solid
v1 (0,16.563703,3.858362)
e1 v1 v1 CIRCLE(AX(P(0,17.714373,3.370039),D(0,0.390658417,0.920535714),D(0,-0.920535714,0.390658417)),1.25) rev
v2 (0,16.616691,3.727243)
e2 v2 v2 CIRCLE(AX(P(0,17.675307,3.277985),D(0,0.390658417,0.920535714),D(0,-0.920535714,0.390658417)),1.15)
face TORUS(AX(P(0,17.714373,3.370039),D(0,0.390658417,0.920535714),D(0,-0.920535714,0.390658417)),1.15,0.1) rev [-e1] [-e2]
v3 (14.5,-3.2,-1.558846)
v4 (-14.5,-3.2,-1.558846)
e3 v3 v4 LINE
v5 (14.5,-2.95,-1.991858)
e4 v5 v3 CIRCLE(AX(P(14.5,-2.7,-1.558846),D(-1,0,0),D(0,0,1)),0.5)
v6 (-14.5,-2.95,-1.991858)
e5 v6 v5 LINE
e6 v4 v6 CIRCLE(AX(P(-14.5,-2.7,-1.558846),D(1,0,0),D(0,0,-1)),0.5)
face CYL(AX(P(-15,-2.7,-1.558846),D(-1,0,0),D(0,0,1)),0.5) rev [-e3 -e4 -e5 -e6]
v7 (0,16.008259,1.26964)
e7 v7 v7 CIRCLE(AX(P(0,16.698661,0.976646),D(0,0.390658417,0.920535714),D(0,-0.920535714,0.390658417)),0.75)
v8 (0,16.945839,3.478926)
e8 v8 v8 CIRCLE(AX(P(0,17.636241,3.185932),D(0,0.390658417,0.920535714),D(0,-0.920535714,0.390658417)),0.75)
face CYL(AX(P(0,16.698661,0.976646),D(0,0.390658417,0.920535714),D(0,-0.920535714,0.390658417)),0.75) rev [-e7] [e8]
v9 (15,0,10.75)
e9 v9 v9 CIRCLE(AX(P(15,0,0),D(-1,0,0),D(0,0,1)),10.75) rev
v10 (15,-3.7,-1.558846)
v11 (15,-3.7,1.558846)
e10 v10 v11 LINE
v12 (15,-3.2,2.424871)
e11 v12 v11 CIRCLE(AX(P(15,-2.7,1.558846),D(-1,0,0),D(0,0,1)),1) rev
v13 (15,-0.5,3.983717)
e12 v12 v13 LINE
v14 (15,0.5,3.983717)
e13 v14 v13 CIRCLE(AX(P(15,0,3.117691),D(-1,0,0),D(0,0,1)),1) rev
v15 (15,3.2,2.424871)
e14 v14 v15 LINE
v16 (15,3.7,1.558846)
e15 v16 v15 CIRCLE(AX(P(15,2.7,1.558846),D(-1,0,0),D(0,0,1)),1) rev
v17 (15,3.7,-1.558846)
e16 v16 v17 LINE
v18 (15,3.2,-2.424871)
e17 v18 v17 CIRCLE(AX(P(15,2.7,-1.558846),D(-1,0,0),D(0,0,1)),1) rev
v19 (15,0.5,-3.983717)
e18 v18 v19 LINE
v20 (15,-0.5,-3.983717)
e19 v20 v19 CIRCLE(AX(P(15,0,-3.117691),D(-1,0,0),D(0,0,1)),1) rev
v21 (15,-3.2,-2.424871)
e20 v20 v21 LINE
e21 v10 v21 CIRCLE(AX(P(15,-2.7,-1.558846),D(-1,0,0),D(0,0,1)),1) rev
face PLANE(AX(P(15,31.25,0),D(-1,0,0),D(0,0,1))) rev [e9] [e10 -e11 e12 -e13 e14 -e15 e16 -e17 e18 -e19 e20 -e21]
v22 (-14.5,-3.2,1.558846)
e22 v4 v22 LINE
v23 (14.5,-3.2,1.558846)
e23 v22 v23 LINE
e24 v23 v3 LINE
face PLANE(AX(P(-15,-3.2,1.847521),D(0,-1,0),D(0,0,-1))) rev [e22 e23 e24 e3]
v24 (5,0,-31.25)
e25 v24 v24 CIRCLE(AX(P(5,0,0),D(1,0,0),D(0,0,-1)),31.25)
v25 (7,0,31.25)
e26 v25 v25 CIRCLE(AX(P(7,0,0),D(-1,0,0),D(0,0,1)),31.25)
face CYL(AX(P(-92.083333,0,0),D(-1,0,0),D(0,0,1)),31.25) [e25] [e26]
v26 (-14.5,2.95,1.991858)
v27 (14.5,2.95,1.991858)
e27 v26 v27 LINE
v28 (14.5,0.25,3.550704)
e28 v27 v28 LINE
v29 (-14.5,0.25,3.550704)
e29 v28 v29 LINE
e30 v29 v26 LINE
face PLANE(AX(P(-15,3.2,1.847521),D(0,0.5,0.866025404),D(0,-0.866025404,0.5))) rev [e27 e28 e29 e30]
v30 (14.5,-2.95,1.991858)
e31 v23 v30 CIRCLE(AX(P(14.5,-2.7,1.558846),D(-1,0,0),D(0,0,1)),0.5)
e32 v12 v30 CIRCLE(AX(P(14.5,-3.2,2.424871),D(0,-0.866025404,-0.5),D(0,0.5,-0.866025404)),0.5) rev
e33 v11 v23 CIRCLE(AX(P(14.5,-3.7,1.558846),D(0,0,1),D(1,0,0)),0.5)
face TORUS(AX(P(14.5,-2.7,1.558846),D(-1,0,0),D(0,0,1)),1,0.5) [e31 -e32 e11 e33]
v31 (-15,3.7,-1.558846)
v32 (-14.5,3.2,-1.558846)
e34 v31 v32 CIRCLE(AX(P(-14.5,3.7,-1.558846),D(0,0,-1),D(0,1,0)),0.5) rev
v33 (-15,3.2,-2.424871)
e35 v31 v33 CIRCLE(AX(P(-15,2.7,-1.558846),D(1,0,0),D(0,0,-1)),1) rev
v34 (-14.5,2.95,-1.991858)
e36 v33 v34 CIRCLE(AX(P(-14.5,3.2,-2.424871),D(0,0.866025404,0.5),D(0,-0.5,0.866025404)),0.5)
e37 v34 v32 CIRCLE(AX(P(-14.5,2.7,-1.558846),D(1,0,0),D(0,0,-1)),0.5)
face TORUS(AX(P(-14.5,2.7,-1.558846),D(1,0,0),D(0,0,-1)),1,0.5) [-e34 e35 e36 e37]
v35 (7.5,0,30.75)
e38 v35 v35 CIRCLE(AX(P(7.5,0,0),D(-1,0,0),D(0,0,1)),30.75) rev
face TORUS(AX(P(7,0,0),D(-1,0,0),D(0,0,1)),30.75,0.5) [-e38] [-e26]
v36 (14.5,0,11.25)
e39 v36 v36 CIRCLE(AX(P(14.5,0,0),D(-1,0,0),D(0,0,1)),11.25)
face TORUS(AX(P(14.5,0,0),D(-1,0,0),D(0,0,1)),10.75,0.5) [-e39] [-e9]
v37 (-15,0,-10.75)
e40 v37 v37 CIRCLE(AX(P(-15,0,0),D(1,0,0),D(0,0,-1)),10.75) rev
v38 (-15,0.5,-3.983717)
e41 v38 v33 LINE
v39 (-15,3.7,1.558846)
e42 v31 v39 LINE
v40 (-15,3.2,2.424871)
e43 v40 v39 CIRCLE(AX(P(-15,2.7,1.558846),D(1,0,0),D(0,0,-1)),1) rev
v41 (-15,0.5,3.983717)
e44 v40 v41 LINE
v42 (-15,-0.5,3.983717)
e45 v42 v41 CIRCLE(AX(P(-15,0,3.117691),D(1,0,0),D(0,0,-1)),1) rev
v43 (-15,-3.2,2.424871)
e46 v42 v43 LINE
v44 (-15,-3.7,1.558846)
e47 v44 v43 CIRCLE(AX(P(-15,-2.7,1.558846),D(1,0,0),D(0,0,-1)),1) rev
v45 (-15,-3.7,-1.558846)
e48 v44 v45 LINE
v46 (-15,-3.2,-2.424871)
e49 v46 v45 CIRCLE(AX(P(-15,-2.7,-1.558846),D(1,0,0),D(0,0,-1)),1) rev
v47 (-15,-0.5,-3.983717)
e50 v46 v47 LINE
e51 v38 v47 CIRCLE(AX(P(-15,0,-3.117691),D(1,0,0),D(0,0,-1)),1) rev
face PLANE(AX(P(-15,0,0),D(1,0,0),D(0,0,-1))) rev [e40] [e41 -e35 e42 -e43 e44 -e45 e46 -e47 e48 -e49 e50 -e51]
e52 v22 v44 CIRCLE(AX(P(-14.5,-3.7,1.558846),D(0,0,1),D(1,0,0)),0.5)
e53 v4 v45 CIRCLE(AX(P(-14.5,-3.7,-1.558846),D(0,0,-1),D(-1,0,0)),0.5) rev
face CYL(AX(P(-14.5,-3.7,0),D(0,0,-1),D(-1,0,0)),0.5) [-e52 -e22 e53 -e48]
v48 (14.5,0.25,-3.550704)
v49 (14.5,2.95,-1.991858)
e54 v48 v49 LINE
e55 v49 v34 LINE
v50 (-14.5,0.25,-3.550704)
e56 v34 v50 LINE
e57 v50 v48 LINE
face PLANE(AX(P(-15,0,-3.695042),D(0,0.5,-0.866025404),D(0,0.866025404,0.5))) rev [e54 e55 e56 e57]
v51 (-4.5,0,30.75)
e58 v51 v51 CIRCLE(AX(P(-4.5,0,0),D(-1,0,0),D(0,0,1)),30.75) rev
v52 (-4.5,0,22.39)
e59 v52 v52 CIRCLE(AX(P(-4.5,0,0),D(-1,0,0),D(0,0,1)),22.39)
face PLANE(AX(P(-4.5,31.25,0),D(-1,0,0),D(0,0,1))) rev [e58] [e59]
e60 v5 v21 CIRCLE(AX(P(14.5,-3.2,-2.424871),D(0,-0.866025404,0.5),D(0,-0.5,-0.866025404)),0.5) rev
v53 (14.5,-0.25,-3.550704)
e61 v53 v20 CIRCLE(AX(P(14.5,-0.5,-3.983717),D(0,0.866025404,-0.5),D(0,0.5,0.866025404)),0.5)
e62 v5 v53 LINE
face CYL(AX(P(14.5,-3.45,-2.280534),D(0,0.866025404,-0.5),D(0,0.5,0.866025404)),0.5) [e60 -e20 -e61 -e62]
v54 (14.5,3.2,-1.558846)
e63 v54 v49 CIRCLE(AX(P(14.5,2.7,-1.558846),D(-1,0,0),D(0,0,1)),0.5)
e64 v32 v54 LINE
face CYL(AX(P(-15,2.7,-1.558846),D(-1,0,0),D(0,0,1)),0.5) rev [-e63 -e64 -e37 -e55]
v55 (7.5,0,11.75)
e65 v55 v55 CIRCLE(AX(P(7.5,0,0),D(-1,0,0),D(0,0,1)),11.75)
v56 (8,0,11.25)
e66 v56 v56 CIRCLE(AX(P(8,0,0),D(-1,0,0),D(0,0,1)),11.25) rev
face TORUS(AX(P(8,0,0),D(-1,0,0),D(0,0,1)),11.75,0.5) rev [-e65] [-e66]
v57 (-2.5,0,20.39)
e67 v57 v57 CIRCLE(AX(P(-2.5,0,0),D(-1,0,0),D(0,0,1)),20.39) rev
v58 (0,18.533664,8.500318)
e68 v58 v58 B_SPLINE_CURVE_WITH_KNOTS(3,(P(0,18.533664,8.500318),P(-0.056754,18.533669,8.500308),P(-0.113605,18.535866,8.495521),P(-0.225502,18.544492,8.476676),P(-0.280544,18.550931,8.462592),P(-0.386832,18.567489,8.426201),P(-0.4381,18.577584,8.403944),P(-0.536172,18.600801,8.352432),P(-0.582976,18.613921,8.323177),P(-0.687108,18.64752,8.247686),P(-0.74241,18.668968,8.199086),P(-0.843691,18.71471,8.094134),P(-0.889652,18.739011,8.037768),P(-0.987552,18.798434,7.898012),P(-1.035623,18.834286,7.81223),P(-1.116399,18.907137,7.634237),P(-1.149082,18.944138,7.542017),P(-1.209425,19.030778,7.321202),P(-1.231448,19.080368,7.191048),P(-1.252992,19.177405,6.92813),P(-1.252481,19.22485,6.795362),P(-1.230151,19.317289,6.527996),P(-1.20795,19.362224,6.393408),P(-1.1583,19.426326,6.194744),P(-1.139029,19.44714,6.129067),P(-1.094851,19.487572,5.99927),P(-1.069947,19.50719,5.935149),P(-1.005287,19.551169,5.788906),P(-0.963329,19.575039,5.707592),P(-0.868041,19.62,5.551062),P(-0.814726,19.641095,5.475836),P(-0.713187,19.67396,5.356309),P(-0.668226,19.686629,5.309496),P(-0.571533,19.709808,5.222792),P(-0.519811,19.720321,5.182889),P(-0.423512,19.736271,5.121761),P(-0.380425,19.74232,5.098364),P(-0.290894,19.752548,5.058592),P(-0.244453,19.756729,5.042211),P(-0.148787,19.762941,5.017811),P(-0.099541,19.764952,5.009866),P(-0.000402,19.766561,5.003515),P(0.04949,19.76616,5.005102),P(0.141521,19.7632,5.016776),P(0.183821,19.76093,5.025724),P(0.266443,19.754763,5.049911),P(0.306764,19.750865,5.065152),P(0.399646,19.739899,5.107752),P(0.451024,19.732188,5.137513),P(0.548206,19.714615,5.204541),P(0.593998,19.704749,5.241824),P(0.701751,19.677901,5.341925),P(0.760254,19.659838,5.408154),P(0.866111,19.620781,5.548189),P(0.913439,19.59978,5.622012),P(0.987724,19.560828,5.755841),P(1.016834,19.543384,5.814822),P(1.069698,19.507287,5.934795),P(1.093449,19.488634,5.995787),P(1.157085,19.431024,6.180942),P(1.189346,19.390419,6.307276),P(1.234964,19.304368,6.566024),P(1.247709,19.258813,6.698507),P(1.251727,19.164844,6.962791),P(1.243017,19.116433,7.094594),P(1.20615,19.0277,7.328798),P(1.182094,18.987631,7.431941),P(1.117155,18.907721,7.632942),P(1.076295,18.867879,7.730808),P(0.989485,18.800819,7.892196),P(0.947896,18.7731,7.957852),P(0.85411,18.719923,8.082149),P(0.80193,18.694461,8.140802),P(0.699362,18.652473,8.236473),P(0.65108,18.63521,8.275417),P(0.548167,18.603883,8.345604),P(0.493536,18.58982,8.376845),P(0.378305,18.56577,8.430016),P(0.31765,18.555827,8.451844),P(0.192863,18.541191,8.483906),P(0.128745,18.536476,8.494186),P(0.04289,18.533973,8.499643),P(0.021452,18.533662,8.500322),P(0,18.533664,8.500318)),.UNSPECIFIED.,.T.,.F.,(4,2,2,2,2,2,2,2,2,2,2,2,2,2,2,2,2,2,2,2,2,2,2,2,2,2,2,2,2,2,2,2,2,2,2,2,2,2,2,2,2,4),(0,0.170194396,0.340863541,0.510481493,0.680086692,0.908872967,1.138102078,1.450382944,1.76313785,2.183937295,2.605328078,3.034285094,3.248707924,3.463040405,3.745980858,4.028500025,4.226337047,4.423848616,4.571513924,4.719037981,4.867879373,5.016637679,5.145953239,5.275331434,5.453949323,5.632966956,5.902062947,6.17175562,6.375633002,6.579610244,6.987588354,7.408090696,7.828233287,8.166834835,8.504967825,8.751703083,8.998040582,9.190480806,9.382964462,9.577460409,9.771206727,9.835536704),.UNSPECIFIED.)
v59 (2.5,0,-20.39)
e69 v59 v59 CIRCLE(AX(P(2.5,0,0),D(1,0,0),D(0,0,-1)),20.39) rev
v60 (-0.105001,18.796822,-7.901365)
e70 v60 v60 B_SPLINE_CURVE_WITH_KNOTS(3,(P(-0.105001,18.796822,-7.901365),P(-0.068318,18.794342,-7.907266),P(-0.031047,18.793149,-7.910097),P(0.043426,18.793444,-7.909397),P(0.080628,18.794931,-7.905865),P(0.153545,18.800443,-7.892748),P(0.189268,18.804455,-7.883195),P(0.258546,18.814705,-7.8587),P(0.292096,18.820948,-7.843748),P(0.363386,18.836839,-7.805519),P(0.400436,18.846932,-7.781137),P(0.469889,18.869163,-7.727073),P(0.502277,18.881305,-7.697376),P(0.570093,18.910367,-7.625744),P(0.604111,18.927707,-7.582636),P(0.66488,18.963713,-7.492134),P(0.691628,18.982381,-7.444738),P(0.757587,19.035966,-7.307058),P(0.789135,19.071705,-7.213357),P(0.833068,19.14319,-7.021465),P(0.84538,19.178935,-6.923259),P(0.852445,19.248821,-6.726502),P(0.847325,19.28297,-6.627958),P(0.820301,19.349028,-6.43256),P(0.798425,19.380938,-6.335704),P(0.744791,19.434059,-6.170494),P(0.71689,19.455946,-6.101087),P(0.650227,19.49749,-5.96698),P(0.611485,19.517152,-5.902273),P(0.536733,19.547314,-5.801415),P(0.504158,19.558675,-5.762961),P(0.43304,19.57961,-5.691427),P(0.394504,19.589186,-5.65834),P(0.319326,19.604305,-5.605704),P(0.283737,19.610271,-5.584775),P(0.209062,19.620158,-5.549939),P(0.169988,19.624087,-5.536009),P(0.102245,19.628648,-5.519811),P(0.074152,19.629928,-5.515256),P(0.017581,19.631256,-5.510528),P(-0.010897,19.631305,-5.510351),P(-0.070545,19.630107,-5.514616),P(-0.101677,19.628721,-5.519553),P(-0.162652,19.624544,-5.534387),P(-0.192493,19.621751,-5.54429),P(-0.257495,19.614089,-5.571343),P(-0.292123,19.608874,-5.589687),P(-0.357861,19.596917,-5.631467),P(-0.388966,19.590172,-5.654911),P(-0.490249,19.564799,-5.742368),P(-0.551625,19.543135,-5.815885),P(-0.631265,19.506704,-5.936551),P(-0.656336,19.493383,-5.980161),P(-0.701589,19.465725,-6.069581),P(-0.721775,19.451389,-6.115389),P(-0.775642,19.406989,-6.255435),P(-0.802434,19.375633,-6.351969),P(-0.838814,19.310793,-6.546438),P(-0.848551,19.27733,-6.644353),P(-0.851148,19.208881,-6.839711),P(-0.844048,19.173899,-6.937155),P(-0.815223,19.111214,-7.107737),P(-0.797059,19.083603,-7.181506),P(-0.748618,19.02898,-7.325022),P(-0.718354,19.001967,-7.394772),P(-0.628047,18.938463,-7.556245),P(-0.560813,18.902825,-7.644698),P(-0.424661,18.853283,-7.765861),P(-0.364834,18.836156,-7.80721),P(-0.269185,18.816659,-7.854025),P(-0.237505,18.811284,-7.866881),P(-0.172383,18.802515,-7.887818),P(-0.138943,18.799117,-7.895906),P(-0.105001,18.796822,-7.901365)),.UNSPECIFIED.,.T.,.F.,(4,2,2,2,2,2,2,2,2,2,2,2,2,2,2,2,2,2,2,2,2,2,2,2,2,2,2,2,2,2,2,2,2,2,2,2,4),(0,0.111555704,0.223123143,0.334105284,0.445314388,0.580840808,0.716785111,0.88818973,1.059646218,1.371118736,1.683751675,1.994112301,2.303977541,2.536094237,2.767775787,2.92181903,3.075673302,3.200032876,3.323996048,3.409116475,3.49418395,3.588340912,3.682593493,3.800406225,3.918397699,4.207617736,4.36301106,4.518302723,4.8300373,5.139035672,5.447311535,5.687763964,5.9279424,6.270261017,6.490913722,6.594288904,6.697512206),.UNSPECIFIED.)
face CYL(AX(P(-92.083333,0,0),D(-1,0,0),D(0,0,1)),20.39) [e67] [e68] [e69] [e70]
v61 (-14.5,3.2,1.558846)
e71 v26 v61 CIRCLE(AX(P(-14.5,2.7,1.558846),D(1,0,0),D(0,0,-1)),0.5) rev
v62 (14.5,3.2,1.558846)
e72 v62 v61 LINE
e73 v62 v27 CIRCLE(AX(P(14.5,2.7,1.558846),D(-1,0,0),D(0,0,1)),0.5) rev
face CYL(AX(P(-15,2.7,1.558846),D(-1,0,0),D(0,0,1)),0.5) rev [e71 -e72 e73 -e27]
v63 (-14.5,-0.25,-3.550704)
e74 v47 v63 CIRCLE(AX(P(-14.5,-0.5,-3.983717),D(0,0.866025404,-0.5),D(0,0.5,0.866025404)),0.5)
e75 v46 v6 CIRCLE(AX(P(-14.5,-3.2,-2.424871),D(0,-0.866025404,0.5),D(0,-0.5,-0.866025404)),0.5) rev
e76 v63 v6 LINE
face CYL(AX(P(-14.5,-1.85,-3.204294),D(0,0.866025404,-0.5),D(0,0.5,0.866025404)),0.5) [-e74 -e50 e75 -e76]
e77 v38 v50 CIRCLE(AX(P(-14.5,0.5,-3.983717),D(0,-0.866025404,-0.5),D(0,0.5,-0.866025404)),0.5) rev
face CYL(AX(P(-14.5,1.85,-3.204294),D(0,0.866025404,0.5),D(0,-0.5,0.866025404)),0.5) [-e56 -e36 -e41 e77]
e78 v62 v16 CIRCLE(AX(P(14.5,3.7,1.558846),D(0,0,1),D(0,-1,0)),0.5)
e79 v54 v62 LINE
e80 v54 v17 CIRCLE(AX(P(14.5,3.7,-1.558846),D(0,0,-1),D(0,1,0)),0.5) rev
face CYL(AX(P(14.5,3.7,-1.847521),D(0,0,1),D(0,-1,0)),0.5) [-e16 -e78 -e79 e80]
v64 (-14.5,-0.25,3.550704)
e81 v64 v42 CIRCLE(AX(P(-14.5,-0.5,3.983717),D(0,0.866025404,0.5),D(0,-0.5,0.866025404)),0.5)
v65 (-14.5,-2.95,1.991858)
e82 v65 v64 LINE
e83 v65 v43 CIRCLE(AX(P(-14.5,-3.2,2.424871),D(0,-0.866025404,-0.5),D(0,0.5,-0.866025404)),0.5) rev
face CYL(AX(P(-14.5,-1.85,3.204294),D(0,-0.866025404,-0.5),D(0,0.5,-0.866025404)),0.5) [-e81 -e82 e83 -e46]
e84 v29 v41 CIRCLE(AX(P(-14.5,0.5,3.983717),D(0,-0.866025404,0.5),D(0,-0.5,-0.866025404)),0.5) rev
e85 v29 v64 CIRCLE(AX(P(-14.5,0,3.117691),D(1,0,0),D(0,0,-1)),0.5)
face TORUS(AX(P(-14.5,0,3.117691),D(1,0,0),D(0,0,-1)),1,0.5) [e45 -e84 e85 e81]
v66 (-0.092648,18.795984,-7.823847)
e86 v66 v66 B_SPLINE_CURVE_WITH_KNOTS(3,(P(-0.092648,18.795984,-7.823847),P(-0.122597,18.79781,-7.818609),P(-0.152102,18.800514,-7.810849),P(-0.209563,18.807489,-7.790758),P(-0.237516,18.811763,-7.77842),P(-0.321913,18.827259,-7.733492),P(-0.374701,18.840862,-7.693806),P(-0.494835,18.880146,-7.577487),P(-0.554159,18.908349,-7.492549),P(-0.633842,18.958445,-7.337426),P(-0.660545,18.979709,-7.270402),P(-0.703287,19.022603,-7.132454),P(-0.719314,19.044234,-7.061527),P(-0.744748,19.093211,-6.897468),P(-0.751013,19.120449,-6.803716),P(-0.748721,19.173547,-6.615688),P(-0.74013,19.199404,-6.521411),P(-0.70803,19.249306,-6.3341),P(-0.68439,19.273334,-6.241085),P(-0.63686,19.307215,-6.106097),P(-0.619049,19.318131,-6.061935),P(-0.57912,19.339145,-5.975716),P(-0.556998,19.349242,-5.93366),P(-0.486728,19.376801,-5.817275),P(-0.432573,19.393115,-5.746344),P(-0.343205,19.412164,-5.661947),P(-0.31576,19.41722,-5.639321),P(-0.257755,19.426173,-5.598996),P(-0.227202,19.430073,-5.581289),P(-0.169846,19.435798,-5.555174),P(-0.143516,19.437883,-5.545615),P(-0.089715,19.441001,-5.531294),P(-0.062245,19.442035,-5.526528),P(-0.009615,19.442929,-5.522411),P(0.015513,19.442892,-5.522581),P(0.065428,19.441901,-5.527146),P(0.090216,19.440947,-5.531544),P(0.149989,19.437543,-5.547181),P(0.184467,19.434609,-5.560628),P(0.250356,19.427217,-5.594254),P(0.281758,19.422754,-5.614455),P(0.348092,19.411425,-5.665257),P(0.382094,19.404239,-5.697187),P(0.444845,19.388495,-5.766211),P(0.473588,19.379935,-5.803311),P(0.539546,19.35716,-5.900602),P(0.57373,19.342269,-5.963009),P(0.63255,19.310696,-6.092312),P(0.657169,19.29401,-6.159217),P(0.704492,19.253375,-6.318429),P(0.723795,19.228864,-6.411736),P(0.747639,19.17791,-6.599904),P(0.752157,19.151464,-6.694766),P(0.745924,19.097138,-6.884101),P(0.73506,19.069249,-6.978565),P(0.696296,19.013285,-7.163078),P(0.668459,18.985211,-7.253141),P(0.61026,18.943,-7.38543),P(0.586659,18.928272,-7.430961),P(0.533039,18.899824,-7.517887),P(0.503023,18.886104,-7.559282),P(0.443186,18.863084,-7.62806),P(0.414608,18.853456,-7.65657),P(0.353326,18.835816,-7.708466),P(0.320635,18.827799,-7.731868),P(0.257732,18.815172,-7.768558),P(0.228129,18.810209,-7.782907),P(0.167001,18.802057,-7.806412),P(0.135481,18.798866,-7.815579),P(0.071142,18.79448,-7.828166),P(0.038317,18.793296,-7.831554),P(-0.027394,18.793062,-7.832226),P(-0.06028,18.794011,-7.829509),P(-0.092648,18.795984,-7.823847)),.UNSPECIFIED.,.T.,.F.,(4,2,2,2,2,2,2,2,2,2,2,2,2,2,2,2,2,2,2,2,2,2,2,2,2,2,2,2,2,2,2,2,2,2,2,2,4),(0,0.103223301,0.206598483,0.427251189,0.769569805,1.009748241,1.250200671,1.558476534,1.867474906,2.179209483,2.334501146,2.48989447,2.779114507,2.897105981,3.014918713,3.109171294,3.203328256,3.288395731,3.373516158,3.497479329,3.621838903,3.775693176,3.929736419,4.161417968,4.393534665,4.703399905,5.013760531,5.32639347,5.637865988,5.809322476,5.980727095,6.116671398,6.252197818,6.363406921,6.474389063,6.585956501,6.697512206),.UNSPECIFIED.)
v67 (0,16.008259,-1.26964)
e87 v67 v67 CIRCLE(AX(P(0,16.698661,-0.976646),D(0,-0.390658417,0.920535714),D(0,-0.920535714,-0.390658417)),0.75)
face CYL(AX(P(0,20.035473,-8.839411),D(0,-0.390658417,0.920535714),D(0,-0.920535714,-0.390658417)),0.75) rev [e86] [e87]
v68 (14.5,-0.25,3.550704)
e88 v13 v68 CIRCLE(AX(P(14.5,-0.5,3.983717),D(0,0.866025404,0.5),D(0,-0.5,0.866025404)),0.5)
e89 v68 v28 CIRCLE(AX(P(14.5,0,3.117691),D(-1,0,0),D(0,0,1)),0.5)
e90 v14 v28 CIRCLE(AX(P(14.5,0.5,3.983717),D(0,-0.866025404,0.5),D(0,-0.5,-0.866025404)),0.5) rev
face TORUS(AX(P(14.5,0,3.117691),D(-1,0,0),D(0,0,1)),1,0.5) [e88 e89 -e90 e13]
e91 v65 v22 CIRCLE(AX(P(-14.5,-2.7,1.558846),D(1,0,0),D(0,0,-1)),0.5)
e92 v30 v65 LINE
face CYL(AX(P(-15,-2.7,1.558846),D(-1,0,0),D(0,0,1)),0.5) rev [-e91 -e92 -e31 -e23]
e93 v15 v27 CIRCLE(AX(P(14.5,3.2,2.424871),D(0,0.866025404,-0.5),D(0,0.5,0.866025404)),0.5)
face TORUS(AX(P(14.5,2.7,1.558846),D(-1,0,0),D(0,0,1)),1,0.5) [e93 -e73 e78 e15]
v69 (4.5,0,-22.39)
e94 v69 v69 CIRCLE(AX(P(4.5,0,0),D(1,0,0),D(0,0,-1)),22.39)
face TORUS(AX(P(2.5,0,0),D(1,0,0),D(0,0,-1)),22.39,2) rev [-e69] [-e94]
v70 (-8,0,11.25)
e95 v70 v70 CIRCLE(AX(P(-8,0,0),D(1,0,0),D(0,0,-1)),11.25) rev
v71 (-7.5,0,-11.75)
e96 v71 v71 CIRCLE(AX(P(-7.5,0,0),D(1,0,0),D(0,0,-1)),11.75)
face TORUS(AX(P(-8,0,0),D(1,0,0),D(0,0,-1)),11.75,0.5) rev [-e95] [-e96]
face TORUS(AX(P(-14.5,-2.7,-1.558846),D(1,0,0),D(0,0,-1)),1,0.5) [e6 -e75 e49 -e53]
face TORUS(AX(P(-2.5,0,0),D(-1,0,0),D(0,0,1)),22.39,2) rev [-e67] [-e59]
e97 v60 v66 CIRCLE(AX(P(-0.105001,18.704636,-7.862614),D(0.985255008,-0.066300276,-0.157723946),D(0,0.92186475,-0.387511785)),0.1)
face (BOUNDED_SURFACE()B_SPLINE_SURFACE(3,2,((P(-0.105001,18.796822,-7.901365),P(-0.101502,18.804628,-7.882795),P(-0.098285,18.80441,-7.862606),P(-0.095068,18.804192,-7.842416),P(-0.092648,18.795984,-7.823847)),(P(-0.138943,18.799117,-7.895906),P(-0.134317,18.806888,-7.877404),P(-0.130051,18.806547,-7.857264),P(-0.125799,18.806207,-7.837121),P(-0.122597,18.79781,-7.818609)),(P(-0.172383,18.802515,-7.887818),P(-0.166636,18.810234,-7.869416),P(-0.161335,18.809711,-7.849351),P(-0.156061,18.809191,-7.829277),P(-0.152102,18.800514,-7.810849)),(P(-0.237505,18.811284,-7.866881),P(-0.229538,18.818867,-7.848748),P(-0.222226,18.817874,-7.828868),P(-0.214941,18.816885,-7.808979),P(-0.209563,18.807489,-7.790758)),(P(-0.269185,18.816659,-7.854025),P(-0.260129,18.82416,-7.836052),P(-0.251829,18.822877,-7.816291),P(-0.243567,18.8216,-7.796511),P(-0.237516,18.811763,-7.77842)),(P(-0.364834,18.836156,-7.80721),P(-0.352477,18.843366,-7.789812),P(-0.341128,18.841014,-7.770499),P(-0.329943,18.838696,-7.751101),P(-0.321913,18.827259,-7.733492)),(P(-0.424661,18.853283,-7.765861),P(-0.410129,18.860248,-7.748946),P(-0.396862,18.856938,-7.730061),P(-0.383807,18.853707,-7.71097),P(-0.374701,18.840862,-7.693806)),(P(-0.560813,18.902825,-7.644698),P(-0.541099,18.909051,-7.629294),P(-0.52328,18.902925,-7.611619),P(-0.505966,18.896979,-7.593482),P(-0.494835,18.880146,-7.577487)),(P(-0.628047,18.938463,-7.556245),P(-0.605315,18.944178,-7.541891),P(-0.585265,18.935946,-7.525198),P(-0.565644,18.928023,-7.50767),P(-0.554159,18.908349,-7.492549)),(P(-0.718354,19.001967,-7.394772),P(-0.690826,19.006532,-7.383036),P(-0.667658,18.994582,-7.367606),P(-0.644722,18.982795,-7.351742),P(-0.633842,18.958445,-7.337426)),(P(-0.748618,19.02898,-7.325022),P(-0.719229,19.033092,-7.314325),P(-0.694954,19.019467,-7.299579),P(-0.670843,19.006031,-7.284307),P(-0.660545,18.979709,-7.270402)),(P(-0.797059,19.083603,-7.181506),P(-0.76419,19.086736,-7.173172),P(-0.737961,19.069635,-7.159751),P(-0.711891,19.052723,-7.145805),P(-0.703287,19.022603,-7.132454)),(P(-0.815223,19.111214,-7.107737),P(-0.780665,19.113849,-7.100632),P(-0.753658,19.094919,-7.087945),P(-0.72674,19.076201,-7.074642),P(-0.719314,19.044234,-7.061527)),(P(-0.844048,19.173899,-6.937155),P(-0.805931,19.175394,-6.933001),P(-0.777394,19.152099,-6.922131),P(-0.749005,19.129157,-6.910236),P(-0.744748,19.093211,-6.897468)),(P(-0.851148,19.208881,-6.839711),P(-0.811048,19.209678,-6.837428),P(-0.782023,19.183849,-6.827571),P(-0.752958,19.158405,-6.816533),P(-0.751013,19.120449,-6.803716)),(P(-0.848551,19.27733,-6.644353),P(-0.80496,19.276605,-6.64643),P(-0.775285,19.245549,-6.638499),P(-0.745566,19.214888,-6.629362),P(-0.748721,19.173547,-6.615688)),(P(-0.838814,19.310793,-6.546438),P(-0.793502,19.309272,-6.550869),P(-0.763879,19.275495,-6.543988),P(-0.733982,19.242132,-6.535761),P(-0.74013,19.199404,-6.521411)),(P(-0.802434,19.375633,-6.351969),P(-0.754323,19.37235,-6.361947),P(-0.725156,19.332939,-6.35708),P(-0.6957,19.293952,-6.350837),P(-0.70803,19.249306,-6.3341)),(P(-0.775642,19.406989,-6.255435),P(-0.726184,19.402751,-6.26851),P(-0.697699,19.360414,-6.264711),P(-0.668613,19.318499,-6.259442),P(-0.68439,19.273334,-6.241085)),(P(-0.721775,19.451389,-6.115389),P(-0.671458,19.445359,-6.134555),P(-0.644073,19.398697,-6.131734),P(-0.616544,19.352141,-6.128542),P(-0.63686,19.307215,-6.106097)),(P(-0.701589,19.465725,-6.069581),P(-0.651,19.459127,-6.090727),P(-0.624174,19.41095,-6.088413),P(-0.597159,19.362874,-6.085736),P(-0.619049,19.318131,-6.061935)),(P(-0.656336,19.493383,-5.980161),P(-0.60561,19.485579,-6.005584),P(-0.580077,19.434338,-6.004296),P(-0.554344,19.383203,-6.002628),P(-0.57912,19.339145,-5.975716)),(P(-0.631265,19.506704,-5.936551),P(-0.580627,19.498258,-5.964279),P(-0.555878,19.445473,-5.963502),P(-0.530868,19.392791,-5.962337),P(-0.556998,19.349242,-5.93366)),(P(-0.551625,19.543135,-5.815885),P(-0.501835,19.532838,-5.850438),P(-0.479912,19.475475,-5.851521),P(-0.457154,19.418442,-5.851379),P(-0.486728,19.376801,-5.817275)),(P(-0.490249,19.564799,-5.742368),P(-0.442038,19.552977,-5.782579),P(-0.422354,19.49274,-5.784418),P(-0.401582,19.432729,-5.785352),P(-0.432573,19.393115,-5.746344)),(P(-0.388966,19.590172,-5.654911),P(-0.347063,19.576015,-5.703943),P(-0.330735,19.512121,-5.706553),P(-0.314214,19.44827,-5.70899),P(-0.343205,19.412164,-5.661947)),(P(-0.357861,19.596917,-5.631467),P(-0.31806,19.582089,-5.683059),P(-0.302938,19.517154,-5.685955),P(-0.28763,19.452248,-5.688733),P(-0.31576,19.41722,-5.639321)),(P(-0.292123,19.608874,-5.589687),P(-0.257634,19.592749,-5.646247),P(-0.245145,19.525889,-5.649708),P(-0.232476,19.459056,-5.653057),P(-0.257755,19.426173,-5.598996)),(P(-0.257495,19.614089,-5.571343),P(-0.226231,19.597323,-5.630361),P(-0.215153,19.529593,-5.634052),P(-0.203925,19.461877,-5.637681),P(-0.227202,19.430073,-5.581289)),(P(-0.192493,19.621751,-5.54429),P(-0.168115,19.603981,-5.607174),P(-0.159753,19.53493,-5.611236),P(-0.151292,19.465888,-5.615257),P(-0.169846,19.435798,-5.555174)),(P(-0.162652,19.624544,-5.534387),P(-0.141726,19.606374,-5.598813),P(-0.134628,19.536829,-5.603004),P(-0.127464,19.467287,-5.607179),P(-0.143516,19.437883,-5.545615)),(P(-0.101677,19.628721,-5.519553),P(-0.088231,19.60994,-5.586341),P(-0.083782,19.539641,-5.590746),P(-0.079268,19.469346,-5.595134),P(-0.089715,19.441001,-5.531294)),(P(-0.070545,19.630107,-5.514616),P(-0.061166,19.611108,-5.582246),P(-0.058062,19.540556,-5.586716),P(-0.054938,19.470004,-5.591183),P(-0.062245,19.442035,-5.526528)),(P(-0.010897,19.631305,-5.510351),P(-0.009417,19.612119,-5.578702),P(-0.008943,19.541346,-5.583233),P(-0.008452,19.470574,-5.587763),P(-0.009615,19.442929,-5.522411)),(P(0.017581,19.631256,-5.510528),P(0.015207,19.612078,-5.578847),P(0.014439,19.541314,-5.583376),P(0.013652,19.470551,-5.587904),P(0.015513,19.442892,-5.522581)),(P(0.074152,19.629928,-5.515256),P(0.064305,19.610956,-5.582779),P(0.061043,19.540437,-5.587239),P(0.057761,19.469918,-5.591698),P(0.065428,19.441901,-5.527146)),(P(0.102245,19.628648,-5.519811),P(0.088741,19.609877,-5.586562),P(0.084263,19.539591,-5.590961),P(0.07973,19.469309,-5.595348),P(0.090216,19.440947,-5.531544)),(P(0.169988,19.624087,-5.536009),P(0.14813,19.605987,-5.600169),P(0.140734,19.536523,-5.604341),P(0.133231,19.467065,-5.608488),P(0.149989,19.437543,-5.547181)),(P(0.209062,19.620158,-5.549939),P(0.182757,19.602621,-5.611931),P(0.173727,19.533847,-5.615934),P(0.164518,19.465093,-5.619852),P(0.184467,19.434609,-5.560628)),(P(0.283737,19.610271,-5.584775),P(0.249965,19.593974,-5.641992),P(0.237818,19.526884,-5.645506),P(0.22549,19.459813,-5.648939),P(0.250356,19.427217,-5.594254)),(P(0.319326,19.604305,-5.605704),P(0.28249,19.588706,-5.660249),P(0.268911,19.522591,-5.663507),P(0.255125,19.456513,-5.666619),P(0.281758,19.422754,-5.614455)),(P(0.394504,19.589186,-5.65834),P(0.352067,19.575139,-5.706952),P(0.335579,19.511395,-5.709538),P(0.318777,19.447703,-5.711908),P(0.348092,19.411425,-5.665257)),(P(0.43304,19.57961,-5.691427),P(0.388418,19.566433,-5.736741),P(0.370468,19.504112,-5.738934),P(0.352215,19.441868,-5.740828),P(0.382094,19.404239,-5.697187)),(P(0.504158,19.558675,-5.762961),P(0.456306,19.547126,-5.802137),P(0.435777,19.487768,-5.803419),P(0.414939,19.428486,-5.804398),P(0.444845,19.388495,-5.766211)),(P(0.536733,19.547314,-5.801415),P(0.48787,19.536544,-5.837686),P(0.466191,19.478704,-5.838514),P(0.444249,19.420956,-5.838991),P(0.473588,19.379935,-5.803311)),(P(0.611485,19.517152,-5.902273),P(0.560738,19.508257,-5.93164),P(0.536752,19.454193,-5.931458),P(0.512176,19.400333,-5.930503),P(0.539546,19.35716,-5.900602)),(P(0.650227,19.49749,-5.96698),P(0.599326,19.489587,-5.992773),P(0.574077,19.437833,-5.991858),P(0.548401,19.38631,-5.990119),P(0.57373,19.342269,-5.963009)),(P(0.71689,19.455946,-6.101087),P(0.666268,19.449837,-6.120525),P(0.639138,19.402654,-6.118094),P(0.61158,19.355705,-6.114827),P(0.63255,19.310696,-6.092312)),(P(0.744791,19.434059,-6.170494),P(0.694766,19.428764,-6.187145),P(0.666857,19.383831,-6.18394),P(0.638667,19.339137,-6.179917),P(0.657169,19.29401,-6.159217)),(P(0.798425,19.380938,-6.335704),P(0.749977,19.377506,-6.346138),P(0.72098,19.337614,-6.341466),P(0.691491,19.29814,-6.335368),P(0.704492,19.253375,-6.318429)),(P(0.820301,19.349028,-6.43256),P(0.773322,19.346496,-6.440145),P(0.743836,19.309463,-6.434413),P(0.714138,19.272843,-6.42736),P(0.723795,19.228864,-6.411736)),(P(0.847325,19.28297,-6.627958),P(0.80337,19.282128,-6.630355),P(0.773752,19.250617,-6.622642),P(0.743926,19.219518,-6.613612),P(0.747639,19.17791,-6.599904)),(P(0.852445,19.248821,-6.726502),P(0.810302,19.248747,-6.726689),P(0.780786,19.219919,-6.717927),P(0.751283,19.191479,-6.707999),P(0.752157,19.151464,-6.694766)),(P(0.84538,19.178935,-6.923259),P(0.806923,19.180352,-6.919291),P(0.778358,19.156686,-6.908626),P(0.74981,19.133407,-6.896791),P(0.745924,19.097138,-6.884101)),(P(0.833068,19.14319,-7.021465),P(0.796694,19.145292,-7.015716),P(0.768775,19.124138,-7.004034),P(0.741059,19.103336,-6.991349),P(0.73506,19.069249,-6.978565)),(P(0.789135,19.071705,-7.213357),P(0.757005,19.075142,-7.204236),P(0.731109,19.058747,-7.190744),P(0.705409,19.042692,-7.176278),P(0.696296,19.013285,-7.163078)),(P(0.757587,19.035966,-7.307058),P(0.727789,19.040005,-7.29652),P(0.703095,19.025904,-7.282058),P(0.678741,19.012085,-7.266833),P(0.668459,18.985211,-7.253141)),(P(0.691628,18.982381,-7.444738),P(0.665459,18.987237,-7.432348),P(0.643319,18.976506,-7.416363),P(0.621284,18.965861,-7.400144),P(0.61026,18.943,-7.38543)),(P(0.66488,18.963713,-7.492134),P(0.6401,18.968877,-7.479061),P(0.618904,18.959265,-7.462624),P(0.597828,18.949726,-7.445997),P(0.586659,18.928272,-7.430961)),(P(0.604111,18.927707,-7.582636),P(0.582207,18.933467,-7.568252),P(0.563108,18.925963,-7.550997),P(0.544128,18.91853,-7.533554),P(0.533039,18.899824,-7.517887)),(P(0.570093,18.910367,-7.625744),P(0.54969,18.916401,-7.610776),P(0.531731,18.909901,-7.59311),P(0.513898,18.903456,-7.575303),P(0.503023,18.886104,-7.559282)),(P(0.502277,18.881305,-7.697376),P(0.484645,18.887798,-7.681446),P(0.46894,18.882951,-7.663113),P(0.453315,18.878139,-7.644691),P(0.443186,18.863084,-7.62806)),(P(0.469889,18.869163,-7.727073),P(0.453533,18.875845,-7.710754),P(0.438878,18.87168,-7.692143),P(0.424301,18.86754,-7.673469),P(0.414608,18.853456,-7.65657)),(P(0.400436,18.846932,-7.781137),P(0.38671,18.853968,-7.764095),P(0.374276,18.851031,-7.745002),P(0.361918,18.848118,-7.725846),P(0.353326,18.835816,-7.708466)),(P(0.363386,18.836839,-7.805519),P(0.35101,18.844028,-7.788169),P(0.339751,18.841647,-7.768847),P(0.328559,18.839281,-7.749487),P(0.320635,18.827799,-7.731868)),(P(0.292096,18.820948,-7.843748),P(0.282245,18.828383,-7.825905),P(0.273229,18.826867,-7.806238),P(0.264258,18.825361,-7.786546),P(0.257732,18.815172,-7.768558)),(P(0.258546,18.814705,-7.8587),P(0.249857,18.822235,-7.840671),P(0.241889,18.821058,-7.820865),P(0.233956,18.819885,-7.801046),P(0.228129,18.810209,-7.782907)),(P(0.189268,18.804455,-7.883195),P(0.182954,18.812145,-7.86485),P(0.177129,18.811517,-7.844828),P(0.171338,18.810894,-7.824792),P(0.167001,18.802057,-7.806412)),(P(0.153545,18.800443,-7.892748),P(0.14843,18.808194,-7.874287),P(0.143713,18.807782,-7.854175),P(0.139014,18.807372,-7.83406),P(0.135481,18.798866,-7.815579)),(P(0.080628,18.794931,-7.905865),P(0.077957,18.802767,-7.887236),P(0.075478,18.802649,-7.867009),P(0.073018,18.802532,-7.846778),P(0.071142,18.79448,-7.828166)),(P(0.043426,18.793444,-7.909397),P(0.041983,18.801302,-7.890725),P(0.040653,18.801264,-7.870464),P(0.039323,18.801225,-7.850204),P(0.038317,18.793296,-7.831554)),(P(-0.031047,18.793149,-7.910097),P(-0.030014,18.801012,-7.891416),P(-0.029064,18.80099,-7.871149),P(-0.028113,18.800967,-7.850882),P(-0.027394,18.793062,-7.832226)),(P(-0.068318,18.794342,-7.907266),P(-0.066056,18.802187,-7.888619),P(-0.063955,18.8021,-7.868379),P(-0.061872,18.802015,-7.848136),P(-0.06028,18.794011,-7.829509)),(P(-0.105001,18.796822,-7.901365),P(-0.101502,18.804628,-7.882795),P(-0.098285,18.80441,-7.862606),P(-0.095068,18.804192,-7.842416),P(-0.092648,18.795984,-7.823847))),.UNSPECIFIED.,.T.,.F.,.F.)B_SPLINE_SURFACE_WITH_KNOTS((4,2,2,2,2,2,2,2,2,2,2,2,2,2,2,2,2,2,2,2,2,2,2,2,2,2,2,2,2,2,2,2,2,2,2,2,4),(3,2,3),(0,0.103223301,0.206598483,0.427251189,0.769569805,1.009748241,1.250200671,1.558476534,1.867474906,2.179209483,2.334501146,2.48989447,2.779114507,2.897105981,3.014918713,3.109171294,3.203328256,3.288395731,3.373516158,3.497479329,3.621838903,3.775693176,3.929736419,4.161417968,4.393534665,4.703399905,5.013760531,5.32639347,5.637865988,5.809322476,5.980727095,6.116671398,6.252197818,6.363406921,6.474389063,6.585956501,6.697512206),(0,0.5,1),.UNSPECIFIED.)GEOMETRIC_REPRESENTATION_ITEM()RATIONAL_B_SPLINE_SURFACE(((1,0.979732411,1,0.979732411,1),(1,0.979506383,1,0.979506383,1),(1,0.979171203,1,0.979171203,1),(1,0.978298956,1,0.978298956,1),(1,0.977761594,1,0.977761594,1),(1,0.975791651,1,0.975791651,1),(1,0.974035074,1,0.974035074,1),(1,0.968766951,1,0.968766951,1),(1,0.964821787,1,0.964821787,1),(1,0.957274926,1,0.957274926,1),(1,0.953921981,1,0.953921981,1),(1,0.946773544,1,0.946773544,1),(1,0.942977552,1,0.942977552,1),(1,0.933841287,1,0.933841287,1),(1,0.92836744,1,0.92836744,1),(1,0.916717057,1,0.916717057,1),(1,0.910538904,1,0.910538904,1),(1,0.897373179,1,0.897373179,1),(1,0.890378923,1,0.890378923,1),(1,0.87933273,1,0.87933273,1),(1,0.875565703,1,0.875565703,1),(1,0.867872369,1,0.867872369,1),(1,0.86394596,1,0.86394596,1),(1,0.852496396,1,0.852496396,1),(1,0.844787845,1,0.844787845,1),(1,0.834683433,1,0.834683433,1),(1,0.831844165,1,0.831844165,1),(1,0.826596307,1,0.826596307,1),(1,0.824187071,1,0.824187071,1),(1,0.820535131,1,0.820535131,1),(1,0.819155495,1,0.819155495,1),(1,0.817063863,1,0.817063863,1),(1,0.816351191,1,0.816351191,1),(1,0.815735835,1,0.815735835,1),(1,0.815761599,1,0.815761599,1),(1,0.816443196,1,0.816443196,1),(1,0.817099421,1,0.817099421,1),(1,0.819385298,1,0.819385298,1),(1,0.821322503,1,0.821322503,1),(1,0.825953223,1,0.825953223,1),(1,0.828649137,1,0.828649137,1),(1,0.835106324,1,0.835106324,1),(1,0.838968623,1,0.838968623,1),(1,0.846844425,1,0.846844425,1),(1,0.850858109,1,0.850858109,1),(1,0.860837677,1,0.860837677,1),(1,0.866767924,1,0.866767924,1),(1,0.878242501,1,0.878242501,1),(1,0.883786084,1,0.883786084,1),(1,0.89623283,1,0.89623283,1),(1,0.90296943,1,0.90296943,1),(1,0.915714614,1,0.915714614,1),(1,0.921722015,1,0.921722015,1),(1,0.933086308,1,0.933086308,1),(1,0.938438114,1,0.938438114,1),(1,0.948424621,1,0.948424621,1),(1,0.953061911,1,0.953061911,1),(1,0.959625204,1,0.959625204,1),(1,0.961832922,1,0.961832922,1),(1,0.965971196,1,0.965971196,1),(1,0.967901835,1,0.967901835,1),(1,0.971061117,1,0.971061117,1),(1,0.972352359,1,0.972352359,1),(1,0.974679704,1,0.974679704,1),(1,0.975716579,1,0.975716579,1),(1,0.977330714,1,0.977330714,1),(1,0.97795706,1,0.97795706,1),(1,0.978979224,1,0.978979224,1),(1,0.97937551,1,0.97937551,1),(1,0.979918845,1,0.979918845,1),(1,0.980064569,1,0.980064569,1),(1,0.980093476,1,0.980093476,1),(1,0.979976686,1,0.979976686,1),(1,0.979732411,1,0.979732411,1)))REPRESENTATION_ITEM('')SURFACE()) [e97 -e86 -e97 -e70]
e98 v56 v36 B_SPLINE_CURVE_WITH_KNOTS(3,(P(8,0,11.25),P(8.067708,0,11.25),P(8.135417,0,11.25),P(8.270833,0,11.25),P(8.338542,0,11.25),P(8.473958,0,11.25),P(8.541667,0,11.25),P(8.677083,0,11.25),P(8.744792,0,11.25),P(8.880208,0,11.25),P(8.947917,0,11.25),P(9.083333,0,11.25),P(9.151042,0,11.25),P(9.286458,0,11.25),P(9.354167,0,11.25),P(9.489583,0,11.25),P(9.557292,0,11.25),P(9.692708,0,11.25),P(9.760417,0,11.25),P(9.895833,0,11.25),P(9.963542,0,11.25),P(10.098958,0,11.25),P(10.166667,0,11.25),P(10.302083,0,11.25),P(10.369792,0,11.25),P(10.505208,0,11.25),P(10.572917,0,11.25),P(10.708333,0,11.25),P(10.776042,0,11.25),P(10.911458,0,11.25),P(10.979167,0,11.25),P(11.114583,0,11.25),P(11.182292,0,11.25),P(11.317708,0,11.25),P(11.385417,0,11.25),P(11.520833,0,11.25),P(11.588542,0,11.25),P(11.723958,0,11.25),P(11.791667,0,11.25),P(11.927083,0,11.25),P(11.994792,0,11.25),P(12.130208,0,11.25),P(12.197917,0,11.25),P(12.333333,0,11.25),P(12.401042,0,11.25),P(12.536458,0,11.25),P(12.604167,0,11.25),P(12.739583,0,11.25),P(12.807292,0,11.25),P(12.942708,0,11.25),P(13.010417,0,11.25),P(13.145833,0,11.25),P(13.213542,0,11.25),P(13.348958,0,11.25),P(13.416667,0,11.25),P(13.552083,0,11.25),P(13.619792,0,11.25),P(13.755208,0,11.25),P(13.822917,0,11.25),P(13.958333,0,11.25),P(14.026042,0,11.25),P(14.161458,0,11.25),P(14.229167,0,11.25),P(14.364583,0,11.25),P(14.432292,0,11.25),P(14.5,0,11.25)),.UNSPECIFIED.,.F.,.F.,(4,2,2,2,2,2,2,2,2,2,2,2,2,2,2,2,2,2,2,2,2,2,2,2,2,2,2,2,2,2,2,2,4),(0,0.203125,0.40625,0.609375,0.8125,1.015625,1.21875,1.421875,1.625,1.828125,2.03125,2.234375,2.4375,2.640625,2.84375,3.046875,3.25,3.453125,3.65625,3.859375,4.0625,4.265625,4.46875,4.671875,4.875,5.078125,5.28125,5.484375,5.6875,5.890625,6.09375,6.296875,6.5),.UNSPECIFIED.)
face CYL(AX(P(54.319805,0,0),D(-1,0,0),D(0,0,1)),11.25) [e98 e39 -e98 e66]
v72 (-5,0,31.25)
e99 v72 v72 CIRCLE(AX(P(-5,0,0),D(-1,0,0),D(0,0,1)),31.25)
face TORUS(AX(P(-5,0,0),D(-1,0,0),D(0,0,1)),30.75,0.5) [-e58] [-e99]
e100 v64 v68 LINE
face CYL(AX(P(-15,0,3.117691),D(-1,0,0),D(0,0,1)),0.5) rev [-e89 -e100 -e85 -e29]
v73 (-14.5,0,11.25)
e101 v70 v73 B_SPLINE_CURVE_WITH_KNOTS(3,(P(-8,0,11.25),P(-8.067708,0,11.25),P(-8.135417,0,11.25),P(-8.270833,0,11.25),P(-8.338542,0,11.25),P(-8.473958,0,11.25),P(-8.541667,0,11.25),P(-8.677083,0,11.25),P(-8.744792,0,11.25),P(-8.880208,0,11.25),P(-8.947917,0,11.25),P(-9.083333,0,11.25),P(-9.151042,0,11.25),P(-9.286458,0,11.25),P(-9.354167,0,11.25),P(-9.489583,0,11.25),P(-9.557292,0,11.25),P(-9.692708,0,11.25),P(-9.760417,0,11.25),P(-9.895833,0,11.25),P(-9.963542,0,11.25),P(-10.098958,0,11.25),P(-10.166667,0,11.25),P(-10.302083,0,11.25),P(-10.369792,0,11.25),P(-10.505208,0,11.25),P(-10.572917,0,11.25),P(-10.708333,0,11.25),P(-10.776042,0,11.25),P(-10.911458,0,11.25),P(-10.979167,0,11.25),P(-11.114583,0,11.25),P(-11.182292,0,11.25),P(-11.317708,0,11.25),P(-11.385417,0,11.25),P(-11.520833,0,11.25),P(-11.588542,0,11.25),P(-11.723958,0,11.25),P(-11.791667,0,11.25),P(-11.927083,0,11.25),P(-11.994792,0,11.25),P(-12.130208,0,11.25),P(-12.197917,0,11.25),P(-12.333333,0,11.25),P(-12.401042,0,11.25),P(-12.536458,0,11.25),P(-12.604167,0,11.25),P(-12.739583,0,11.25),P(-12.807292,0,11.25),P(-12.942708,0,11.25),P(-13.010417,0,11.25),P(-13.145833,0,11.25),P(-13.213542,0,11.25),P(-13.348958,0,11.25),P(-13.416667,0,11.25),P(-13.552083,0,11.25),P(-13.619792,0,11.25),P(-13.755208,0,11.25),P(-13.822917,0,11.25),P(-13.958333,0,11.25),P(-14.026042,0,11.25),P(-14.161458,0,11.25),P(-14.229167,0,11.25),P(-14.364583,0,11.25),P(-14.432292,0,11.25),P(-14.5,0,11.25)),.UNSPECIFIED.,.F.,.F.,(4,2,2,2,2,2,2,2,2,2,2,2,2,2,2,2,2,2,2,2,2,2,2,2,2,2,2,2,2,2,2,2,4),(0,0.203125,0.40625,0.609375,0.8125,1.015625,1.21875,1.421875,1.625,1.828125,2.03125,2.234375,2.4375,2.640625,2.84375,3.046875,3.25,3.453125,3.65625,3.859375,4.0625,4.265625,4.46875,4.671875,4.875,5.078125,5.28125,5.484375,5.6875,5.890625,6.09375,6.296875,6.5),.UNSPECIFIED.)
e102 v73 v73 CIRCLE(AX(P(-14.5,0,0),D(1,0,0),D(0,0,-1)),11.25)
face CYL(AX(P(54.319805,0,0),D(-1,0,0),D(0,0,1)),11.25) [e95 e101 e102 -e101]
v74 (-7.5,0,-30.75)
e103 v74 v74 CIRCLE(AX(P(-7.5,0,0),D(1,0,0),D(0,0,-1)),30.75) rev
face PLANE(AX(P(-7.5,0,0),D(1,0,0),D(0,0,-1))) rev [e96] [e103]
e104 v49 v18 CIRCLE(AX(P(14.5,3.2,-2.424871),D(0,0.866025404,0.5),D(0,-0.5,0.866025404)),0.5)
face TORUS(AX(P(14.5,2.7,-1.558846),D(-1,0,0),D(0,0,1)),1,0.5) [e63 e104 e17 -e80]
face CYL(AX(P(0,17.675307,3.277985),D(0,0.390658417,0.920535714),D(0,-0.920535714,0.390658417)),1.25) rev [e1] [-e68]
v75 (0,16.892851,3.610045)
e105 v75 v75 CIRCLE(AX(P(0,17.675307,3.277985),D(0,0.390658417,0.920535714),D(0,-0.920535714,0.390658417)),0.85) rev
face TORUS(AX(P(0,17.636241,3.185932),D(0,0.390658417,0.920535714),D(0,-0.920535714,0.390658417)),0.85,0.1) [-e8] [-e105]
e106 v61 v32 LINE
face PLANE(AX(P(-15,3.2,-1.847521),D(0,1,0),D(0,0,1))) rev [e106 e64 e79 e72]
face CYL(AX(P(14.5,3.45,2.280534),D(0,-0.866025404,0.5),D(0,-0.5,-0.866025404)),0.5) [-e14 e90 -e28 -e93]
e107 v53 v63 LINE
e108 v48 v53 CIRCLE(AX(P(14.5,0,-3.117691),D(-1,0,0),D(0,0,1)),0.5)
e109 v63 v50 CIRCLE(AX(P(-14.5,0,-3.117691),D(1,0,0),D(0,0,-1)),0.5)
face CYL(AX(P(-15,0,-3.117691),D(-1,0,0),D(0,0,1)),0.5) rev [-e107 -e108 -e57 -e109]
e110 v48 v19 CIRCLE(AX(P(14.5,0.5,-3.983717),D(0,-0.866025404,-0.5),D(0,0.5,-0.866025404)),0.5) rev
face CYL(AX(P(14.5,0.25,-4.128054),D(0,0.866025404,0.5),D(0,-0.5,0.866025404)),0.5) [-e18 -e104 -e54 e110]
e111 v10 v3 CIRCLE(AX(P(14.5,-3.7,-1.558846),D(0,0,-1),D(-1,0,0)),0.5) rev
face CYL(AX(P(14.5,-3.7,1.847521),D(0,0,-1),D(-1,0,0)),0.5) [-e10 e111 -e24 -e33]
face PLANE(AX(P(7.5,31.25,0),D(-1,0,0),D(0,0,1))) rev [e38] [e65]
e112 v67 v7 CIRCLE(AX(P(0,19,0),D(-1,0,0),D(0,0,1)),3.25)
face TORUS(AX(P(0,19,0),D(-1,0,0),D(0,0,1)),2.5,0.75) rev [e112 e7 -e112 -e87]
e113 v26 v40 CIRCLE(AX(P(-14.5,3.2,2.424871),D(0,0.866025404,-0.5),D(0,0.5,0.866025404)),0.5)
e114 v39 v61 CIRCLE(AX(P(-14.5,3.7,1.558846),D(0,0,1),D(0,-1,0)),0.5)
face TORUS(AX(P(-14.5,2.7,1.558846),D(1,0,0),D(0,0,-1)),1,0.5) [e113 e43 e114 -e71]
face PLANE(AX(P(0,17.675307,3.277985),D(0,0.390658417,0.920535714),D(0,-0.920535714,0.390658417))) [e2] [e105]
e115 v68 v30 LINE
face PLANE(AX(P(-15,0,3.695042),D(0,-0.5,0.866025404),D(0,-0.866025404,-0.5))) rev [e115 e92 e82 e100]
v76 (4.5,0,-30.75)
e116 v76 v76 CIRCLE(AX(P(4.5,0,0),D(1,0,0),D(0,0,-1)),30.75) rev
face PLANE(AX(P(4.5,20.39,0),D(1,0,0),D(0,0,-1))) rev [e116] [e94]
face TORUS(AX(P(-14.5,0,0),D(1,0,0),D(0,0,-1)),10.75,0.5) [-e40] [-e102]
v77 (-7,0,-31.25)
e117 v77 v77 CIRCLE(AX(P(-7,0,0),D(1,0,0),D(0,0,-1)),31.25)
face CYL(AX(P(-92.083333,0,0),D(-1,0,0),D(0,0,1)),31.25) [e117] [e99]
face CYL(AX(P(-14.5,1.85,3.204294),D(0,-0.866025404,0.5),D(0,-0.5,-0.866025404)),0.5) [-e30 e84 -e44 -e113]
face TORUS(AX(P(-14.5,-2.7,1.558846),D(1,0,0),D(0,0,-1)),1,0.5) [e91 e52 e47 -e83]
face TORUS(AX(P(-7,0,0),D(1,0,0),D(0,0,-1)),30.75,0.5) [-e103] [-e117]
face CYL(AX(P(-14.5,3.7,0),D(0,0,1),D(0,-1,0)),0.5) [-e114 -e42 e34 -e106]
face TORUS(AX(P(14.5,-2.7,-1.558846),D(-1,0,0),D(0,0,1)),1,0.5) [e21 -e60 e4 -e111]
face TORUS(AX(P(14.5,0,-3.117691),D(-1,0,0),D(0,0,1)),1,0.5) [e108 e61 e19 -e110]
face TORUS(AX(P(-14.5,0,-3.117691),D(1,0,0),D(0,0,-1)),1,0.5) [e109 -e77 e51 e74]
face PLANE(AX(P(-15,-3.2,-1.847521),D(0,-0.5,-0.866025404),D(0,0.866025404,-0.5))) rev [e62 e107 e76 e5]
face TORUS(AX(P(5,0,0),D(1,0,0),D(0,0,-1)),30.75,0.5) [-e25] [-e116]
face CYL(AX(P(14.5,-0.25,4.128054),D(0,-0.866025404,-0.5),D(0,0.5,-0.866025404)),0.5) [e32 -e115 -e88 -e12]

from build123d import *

# Parameters (mm, degrees)
FILLET1_R                = 2
FILLET2_R                = 0.5
CUT_SWEEP1_OUTLINE_R     = 0.75
CUT_SWEEP1_ANGLE         = 45.990948
CUT_SWEEP1_START         = 7.422509822
CUT_SWEEP1_2_OUTLINE_R   = 0.75
CUT_SWEEP1_2_DEPTH       = 8.577490178
CUT_SWEEP1_3_OUTLINE_R   = 0.75
CUT_SWEEP1_3_DEPTH       = 8.577490178
SKETCH13_R               = 1.25
CUT_EXTRUDE4_DEPTH       = 12.5
FILLET4_R                = 0.1
BOSS_EXTRUDE1_DEPTH      = 15
BOSS_EXTRUDE1_DEPTH_BACK = 15
SKETCH15_R               = 11.25
CUT_EXTRUDE8_DEPTH       = 47.670386756
CUT_EXTRUDE8_DEPTH_BACK  = 47.670386756
FILLET5_R                = 0.5


with BuildPart() as part:
    # Sketch1 → Revolve1 (revolve)
    with BuildSketch(Plane.XY, mode=Mode.PRIVATE) as revolve1_sk:
        Polygon((-7.5, 0), (-7.5, 31.25), (-4.5, 31.25), (-4.5, 20.39), (4.5, 20.39), (4.5, 31.25), (7.5, 31.25), (7.5, 0), align=None)
    revolve(revolve1_sk.sketch.rotate(Axis((-92.083333333, 0, 0), (1, 0, 0)), 90), axis=Axis((-92.083333333, 0, 0), (1, 0, 0)))

    # Fillet1
    fillet1_edges = [part.edges().sort_by_distance(p)[0] for p in [
        (4.5, 0, -20.39),
        (-4.5, 0, -20.39),
    ]]
    fillet(fillet1_edges, radius=FILLET1_R)

    # Fillet2
    fillet2_edges = [part.edges().sort_by_distance(p)[0] for p in [
        (7.5, 0, -31.25),
        (4.5, 0, -31.25),
        (-4.5, 0, -31.25),
        (-7.5, 0, -31.25),
    ]]
    fillet(fillet2_edges, radius=FILLET2_R)

    # Cut-Sweep1: read off the stored shape, not the designer's step
    # Cut-Sweep1 outline → Cut-Sweep1 (revolve, cut)
    with BuildSketch(Plane(origin=(0, 19, 0), x_dir=(0, -0.9205357142801961, 0.3906584169509844), z_dir=(0, 0.3906584169509844, 0.9205357142801961))):
        with Locations((2.5, 0)):
            Circle(CUT_SWEEP1_OUTLINE_R)
    revolve(axis=Axis((0, 19, 0), (1, 0, 0)), revolution_arc=CUT_SWEEP1_ANGLE, mode=Mode.SUBTRACT)

    # Cut-Sweep1 2 outline → Cut-Sweep1 2 (cut)
    with BuildSketch(Plane(origin=(0, 0, 0), x_dir=(1, 0, 0), z_dir=(0, 0.3906584169509792, -0.9205357142801984)).offset(CUT_SWEEP1_START)):
        with Locations((0, -14.990178571)):
            Circle(CUT_SWEEP1_2_OUTLINE_R)
    extrude(amount=CUT_SWEEP1_2_DEPTH, mode=Mode.SUBTRACT)

    # Cut-Sweep1 3 outline → Cut-Sweep1 3 (cut)
    with BuildSketch(Plane(origin=(0, 0, 0), x_dir=(1, 0, 0), z_dir=(0, 0.39065841695098, 0.920535714280198)).offset(CUT_SWEEP1_START)):
        with Locations((0, 14.990178571)):
            Circle(CUT_SWEEP1_3_OUTLINE_R)
    extrude(amount=CUT_SWEEP1_3_DEPTH, mode=Mode.SUBTRACT)

    # Sketch13 → Cut-Extrude4 (cut)
    with BuildSketch(Plane(origin=(0, 8.75954223, 20.640721187), x_dir=(1, 0, 0), z_dir=(0, 0.39065841695097747, 0.9205357142801991))):
        with Locations(Location((0, 14.990178571, 0), (0, 0, 270))):
            Circle(SKETCH13_R)
    extrude(amount=-CUT_EXTRUDE4_DEPTH, mode=Mode.SUBTRACT)

    # Fillet4
    fillet4_edges = [part.edges().sort_by_distance(p)[0] for p in [
        (-0.749235119, 19.215450732, -6.820451098),
        (0, 18.8259764, 2.789662307),
        (-0.75, 17.675306756, 3.277985328),
    ]]
    fillet(fillet4_edges, radius=FILLET4_R)

    # Sketch15 → Boss-Extrude1 (add, two sides: drawn at the far end of the back side and taken through both)
    with BuildSketch(Plane(origin=(0, 0, 0), x_dir=(0, 0, -1), z_dir=(1, 0, 0)).offset(-BOSS_EXTRUDE1_DEPTH_BACK)):
        with Locations(Location((0, 0, 0), (0, 0, 180))):
            Circle(SKETCH15_R)
    extrude(amount=BOSS_EXTRUDE1_DEPTH + BOSS_EXTRUDE1_DEPTH_BACK)

    # Sketch19 → Cut-Extrude8 (cut, two sides: drawn at the far end of the back side and taken through both)
    with BuildSketch(Plane(origin=(0, 0, 0), x_dir=(0, 0, -1), z_dir=(1, 0, 0)).offset(-CUT_EXTRUDE8_DEPTH_BACK)):
        Polygon((1.847520861, 3.2), (-1.847520861, 3.2), (-3.695041723, 0), (-1.847520861, -3.2), (1.847520861, -3.2), (3.695041723, 0), align=None)
    extrude(amount=CUT_EXTRUDE8_DEPTH + CUT_EXTRUDE8_DEPTH_BACK, mode=Mode.SUBTRACT)

    # Fillet5
    fillet5_edges = [part.edges().sort_by_distance(p)[0] for p in [
        (7.5, 0, -11.25),
        (-7.5, 0, -11.25),
        (15, 0, -11.25),
        (-15, 0, -11.25),
        (0, 3.2, -1.847520861),
        (-15, 1.6, -2.771281292),
        (0, 0, -3.695041723),
        (-15, -1.6, -2.771281292),
        (0, -3.2, -1.847520861),
        (-15, -3.2, 0),
        (0, -3.2, 1.847520861),
        (-15, -1.6, 2.771281292),
        (0, 0, 3.695041723),
        (-15, 1.6, 2.771281292),
        (0, 3.2, 1.847520861),
        (-15, 3.2, 0),
        (15, 1.6, -2.771281292),
        (15, 3.2, 0),
        (15, 1.6, 2.771281292),
        (15, -1.6, 2.771281292),
        (15, -3.2, 0),
        (15, -1.6, -2.771281292),
    ]]
    fillet(fillet5_edges, radius=FILLET5_R)


solid = part.part
